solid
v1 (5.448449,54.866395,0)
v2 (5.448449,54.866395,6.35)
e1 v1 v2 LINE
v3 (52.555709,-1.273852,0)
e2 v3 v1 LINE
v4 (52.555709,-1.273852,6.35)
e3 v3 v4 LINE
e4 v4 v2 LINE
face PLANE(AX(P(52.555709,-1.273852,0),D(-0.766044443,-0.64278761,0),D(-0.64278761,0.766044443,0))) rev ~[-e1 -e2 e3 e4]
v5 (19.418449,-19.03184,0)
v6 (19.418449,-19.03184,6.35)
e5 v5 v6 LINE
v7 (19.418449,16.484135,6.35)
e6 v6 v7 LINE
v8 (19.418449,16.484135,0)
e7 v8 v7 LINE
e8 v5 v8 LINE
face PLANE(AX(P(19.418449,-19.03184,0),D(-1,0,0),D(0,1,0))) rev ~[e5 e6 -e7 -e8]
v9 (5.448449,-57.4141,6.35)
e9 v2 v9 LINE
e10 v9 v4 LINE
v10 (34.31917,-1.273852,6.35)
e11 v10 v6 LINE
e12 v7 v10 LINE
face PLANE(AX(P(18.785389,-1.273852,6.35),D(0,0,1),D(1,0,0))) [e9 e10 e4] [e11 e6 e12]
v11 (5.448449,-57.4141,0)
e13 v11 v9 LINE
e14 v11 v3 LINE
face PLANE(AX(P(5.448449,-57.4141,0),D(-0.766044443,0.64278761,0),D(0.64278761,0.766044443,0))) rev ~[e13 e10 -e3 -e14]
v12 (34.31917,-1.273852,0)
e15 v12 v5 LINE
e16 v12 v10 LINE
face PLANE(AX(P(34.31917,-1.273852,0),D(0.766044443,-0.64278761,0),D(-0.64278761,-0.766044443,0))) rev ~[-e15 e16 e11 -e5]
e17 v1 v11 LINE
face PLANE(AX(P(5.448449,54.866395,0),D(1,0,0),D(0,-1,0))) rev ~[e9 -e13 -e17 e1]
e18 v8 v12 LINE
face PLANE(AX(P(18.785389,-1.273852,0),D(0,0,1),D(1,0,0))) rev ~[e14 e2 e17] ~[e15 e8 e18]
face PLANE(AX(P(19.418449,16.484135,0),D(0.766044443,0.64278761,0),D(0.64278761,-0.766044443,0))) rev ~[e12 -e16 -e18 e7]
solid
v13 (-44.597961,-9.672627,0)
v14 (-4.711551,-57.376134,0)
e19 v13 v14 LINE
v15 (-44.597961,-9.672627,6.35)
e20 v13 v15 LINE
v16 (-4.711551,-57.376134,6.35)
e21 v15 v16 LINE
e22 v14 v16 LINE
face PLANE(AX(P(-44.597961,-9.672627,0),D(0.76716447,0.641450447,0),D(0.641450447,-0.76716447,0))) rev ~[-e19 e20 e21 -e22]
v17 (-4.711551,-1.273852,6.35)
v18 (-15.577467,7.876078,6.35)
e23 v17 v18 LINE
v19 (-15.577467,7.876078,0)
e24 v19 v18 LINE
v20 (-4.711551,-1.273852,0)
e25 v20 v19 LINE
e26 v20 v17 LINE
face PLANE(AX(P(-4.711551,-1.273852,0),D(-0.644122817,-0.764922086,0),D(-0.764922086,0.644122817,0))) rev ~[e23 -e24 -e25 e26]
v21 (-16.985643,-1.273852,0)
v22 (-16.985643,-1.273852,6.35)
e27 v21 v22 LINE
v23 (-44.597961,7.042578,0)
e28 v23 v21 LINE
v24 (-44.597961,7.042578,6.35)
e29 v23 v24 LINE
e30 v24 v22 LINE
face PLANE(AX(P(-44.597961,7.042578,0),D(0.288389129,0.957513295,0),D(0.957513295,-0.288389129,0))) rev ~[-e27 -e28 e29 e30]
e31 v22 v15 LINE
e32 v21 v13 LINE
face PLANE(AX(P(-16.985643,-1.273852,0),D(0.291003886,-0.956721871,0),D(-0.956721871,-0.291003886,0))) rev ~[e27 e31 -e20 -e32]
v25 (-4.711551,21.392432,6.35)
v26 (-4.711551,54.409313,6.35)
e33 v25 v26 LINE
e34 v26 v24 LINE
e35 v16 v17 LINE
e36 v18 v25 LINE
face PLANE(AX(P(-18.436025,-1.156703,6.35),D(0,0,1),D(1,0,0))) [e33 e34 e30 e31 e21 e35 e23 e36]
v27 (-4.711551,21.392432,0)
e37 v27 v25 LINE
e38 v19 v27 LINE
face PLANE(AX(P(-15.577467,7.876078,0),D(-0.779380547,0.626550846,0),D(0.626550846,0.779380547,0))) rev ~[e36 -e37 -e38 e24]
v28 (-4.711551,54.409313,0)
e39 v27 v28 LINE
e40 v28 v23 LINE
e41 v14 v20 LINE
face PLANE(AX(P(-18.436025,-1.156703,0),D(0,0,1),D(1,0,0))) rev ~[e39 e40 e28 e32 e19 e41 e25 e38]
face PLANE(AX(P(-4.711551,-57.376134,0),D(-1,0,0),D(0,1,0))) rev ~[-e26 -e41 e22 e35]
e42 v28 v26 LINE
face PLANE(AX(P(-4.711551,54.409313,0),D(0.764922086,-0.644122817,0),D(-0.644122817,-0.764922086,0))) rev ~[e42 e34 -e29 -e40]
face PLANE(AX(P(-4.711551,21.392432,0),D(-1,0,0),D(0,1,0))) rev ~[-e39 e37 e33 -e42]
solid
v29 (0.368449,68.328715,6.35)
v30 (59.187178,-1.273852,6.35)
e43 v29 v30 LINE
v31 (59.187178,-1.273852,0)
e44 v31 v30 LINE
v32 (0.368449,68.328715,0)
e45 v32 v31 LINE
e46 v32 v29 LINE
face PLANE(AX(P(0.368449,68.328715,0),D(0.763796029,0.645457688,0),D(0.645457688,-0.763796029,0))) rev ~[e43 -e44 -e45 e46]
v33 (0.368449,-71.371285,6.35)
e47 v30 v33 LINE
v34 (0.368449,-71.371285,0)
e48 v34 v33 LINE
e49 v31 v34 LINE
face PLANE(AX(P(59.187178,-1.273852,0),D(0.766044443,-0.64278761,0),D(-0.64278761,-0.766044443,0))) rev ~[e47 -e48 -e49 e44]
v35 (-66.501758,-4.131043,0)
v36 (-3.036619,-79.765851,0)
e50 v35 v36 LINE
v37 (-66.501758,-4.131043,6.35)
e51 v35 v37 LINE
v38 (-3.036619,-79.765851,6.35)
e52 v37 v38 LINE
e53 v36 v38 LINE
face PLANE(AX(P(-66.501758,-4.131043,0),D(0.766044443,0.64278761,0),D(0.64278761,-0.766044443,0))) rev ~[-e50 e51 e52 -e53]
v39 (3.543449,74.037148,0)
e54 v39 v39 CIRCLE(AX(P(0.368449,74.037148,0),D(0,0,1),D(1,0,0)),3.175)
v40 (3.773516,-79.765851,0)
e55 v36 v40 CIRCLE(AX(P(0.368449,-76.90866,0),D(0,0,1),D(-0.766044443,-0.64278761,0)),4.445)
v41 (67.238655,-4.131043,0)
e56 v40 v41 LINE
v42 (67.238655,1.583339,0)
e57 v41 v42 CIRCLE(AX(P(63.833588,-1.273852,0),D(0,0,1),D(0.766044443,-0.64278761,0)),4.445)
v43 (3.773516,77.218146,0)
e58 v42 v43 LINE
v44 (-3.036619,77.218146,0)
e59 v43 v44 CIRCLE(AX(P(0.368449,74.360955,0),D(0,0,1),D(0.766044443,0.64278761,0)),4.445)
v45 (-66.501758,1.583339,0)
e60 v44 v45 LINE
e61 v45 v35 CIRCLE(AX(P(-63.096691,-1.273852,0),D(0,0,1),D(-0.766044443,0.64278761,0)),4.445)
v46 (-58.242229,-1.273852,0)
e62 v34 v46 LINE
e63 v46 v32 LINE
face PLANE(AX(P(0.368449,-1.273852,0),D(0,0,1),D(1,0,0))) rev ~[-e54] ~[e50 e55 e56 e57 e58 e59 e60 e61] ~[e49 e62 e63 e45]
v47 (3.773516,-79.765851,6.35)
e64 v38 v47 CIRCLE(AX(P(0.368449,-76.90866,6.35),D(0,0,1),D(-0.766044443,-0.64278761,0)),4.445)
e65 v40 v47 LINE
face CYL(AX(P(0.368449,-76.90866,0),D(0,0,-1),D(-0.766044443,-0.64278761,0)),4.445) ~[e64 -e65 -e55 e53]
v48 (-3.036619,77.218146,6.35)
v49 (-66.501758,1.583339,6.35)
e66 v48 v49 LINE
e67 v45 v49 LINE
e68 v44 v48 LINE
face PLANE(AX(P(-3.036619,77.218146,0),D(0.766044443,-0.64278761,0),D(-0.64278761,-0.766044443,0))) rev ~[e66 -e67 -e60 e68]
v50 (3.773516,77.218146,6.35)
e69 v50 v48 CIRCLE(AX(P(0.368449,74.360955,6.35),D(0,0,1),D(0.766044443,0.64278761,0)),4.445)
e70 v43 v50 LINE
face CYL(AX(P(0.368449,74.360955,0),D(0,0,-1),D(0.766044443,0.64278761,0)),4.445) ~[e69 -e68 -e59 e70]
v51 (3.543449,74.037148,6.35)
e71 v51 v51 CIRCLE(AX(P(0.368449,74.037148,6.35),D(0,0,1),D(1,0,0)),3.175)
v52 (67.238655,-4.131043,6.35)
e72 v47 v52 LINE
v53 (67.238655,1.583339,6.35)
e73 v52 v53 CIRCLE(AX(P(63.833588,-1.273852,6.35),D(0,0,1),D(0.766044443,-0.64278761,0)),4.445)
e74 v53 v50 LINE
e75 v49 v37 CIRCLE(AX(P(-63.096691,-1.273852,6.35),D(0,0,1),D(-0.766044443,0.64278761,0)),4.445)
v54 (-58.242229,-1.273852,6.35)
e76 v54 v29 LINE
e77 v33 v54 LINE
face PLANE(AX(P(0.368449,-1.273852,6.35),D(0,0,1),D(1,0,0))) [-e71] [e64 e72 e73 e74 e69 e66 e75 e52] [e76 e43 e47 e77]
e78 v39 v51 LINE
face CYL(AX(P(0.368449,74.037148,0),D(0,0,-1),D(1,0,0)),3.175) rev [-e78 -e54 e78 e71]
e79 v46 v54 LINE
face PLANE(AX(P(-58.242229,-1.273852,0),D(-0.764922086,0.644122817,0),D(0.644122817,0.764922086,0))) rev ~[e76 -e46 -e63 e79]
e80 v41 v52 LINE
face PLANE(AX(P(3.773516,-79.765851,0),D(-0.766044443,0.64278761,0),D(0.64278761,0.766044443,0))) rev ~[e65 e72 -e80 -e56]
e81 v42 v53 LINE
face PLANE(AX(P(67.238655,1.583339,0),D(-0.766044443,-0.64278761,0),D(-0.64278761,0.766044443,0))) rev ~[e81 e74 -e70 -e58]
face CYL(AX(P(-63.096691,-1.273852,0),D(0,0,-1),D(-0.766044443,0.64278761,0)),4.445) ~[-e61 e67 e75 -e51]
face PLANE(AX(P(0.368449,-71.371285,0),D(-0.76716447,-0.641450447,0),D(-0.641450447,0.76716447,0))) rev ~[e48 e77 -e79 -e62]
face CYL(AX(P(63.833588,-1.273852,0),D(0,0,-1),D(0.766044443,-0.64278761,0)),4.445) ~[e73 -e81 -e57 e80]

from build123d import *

# Parameters (mm, degrees)
F0_R     = 3.175
F1_DEPTH = 6.35


# Not quite as in the source:
# - a length typed as a fraction of an inch, garbled in the dataset ("3 / 203.2 mm" for 3/8 in), is restored


with BuildPart() as f1:
    # F0 (on Top) → F1 (new body)
    with BuildSketch(Plane.XY):
        with BuildLine():
            ThreePointArc((3.7735161073, 77.2181461795), (0.3684485576, 78.8059552545), (-3.036618992, 77.2181461795))
            Line((-3.036618992, 77.2181461795), (-66.5017581446, 1.5833385899))
            ThreePointArc((-66.5017581446, 1.5833385899), (-67.541690595, -1.2738523351), (-66.5017581446, -4.1310432602))
            Line((-66.5017581446, -4.1310432602), (-3.036618992, -79.7658508498))
            ThreePointArc((-3.036618992, -79.7658508498), (0.3684485576, -81.3536599247), (3.7735161073, -79.7658508498))
            Line((3.7735161073, -79.7658508498), (67.2386552599, -4.1310432602))
            ThreePointArc((67.2386552599, -4.1310432602), (68.2785877102, -1.2738523351), (67.2386552599, 1.5833385899))
            Line((67.2386552599, 1.5833385899), (3.7735161073, 77.2181461795))
        make_face()
        Polygon((0.3684485576, -71.3712848975), (-58.2422290914, -1.2738523351), (0.3684485576, 68.3287151025), (59.1871783672, -1.2738523351), align=None, mode=Mode.SUBTRACT)
        with Locations((0.3684485576, 74.0371476649)):
            Circle(F0_R, mode=Mode.SUBTRACT)
    extrude(amount=F1_DEPTH)


with BuildPart() as f1b:
    # F0 (on Top) → F1, piece 2 (new body)
    with BuildSketch(Plane.XY):
        Polygon((52.5557093374, -1.2738523351), (5.4484485576, 54.8663949365), (5.4484485576, -57.4140996067), align=None)
        Polygon((19.4184485576, -19.0318400569), (19.4184485576, 16.4841353867), (34.3191695055, -1.2738523351), align=None, mode=Mode.SUBTRACT)
    extrude(amount=F1_DEPTH)


with BuildPart() as f1c:
    # F0 (on Top) → F1, piece 3 (new body)
    with BuildSketch(Plane.XY):
        Polygon((-4.7115514424, 21.3924322091), (-4.7115514424, 54.4093134561), (-44.5979606519, 7.0425775949), (-16.9856430717, -1.2738523351), (-44.5979606519, -9.6726273153), (-4.7115514424, -57.3761344554), (-4.7115514424, -1.2738523351), (-15.5774667458, 7.87607823), align=None)
    extrude(amount=F1_DEPTH)


solid = Compound([f1.part, f1b.part, f1c.part])
